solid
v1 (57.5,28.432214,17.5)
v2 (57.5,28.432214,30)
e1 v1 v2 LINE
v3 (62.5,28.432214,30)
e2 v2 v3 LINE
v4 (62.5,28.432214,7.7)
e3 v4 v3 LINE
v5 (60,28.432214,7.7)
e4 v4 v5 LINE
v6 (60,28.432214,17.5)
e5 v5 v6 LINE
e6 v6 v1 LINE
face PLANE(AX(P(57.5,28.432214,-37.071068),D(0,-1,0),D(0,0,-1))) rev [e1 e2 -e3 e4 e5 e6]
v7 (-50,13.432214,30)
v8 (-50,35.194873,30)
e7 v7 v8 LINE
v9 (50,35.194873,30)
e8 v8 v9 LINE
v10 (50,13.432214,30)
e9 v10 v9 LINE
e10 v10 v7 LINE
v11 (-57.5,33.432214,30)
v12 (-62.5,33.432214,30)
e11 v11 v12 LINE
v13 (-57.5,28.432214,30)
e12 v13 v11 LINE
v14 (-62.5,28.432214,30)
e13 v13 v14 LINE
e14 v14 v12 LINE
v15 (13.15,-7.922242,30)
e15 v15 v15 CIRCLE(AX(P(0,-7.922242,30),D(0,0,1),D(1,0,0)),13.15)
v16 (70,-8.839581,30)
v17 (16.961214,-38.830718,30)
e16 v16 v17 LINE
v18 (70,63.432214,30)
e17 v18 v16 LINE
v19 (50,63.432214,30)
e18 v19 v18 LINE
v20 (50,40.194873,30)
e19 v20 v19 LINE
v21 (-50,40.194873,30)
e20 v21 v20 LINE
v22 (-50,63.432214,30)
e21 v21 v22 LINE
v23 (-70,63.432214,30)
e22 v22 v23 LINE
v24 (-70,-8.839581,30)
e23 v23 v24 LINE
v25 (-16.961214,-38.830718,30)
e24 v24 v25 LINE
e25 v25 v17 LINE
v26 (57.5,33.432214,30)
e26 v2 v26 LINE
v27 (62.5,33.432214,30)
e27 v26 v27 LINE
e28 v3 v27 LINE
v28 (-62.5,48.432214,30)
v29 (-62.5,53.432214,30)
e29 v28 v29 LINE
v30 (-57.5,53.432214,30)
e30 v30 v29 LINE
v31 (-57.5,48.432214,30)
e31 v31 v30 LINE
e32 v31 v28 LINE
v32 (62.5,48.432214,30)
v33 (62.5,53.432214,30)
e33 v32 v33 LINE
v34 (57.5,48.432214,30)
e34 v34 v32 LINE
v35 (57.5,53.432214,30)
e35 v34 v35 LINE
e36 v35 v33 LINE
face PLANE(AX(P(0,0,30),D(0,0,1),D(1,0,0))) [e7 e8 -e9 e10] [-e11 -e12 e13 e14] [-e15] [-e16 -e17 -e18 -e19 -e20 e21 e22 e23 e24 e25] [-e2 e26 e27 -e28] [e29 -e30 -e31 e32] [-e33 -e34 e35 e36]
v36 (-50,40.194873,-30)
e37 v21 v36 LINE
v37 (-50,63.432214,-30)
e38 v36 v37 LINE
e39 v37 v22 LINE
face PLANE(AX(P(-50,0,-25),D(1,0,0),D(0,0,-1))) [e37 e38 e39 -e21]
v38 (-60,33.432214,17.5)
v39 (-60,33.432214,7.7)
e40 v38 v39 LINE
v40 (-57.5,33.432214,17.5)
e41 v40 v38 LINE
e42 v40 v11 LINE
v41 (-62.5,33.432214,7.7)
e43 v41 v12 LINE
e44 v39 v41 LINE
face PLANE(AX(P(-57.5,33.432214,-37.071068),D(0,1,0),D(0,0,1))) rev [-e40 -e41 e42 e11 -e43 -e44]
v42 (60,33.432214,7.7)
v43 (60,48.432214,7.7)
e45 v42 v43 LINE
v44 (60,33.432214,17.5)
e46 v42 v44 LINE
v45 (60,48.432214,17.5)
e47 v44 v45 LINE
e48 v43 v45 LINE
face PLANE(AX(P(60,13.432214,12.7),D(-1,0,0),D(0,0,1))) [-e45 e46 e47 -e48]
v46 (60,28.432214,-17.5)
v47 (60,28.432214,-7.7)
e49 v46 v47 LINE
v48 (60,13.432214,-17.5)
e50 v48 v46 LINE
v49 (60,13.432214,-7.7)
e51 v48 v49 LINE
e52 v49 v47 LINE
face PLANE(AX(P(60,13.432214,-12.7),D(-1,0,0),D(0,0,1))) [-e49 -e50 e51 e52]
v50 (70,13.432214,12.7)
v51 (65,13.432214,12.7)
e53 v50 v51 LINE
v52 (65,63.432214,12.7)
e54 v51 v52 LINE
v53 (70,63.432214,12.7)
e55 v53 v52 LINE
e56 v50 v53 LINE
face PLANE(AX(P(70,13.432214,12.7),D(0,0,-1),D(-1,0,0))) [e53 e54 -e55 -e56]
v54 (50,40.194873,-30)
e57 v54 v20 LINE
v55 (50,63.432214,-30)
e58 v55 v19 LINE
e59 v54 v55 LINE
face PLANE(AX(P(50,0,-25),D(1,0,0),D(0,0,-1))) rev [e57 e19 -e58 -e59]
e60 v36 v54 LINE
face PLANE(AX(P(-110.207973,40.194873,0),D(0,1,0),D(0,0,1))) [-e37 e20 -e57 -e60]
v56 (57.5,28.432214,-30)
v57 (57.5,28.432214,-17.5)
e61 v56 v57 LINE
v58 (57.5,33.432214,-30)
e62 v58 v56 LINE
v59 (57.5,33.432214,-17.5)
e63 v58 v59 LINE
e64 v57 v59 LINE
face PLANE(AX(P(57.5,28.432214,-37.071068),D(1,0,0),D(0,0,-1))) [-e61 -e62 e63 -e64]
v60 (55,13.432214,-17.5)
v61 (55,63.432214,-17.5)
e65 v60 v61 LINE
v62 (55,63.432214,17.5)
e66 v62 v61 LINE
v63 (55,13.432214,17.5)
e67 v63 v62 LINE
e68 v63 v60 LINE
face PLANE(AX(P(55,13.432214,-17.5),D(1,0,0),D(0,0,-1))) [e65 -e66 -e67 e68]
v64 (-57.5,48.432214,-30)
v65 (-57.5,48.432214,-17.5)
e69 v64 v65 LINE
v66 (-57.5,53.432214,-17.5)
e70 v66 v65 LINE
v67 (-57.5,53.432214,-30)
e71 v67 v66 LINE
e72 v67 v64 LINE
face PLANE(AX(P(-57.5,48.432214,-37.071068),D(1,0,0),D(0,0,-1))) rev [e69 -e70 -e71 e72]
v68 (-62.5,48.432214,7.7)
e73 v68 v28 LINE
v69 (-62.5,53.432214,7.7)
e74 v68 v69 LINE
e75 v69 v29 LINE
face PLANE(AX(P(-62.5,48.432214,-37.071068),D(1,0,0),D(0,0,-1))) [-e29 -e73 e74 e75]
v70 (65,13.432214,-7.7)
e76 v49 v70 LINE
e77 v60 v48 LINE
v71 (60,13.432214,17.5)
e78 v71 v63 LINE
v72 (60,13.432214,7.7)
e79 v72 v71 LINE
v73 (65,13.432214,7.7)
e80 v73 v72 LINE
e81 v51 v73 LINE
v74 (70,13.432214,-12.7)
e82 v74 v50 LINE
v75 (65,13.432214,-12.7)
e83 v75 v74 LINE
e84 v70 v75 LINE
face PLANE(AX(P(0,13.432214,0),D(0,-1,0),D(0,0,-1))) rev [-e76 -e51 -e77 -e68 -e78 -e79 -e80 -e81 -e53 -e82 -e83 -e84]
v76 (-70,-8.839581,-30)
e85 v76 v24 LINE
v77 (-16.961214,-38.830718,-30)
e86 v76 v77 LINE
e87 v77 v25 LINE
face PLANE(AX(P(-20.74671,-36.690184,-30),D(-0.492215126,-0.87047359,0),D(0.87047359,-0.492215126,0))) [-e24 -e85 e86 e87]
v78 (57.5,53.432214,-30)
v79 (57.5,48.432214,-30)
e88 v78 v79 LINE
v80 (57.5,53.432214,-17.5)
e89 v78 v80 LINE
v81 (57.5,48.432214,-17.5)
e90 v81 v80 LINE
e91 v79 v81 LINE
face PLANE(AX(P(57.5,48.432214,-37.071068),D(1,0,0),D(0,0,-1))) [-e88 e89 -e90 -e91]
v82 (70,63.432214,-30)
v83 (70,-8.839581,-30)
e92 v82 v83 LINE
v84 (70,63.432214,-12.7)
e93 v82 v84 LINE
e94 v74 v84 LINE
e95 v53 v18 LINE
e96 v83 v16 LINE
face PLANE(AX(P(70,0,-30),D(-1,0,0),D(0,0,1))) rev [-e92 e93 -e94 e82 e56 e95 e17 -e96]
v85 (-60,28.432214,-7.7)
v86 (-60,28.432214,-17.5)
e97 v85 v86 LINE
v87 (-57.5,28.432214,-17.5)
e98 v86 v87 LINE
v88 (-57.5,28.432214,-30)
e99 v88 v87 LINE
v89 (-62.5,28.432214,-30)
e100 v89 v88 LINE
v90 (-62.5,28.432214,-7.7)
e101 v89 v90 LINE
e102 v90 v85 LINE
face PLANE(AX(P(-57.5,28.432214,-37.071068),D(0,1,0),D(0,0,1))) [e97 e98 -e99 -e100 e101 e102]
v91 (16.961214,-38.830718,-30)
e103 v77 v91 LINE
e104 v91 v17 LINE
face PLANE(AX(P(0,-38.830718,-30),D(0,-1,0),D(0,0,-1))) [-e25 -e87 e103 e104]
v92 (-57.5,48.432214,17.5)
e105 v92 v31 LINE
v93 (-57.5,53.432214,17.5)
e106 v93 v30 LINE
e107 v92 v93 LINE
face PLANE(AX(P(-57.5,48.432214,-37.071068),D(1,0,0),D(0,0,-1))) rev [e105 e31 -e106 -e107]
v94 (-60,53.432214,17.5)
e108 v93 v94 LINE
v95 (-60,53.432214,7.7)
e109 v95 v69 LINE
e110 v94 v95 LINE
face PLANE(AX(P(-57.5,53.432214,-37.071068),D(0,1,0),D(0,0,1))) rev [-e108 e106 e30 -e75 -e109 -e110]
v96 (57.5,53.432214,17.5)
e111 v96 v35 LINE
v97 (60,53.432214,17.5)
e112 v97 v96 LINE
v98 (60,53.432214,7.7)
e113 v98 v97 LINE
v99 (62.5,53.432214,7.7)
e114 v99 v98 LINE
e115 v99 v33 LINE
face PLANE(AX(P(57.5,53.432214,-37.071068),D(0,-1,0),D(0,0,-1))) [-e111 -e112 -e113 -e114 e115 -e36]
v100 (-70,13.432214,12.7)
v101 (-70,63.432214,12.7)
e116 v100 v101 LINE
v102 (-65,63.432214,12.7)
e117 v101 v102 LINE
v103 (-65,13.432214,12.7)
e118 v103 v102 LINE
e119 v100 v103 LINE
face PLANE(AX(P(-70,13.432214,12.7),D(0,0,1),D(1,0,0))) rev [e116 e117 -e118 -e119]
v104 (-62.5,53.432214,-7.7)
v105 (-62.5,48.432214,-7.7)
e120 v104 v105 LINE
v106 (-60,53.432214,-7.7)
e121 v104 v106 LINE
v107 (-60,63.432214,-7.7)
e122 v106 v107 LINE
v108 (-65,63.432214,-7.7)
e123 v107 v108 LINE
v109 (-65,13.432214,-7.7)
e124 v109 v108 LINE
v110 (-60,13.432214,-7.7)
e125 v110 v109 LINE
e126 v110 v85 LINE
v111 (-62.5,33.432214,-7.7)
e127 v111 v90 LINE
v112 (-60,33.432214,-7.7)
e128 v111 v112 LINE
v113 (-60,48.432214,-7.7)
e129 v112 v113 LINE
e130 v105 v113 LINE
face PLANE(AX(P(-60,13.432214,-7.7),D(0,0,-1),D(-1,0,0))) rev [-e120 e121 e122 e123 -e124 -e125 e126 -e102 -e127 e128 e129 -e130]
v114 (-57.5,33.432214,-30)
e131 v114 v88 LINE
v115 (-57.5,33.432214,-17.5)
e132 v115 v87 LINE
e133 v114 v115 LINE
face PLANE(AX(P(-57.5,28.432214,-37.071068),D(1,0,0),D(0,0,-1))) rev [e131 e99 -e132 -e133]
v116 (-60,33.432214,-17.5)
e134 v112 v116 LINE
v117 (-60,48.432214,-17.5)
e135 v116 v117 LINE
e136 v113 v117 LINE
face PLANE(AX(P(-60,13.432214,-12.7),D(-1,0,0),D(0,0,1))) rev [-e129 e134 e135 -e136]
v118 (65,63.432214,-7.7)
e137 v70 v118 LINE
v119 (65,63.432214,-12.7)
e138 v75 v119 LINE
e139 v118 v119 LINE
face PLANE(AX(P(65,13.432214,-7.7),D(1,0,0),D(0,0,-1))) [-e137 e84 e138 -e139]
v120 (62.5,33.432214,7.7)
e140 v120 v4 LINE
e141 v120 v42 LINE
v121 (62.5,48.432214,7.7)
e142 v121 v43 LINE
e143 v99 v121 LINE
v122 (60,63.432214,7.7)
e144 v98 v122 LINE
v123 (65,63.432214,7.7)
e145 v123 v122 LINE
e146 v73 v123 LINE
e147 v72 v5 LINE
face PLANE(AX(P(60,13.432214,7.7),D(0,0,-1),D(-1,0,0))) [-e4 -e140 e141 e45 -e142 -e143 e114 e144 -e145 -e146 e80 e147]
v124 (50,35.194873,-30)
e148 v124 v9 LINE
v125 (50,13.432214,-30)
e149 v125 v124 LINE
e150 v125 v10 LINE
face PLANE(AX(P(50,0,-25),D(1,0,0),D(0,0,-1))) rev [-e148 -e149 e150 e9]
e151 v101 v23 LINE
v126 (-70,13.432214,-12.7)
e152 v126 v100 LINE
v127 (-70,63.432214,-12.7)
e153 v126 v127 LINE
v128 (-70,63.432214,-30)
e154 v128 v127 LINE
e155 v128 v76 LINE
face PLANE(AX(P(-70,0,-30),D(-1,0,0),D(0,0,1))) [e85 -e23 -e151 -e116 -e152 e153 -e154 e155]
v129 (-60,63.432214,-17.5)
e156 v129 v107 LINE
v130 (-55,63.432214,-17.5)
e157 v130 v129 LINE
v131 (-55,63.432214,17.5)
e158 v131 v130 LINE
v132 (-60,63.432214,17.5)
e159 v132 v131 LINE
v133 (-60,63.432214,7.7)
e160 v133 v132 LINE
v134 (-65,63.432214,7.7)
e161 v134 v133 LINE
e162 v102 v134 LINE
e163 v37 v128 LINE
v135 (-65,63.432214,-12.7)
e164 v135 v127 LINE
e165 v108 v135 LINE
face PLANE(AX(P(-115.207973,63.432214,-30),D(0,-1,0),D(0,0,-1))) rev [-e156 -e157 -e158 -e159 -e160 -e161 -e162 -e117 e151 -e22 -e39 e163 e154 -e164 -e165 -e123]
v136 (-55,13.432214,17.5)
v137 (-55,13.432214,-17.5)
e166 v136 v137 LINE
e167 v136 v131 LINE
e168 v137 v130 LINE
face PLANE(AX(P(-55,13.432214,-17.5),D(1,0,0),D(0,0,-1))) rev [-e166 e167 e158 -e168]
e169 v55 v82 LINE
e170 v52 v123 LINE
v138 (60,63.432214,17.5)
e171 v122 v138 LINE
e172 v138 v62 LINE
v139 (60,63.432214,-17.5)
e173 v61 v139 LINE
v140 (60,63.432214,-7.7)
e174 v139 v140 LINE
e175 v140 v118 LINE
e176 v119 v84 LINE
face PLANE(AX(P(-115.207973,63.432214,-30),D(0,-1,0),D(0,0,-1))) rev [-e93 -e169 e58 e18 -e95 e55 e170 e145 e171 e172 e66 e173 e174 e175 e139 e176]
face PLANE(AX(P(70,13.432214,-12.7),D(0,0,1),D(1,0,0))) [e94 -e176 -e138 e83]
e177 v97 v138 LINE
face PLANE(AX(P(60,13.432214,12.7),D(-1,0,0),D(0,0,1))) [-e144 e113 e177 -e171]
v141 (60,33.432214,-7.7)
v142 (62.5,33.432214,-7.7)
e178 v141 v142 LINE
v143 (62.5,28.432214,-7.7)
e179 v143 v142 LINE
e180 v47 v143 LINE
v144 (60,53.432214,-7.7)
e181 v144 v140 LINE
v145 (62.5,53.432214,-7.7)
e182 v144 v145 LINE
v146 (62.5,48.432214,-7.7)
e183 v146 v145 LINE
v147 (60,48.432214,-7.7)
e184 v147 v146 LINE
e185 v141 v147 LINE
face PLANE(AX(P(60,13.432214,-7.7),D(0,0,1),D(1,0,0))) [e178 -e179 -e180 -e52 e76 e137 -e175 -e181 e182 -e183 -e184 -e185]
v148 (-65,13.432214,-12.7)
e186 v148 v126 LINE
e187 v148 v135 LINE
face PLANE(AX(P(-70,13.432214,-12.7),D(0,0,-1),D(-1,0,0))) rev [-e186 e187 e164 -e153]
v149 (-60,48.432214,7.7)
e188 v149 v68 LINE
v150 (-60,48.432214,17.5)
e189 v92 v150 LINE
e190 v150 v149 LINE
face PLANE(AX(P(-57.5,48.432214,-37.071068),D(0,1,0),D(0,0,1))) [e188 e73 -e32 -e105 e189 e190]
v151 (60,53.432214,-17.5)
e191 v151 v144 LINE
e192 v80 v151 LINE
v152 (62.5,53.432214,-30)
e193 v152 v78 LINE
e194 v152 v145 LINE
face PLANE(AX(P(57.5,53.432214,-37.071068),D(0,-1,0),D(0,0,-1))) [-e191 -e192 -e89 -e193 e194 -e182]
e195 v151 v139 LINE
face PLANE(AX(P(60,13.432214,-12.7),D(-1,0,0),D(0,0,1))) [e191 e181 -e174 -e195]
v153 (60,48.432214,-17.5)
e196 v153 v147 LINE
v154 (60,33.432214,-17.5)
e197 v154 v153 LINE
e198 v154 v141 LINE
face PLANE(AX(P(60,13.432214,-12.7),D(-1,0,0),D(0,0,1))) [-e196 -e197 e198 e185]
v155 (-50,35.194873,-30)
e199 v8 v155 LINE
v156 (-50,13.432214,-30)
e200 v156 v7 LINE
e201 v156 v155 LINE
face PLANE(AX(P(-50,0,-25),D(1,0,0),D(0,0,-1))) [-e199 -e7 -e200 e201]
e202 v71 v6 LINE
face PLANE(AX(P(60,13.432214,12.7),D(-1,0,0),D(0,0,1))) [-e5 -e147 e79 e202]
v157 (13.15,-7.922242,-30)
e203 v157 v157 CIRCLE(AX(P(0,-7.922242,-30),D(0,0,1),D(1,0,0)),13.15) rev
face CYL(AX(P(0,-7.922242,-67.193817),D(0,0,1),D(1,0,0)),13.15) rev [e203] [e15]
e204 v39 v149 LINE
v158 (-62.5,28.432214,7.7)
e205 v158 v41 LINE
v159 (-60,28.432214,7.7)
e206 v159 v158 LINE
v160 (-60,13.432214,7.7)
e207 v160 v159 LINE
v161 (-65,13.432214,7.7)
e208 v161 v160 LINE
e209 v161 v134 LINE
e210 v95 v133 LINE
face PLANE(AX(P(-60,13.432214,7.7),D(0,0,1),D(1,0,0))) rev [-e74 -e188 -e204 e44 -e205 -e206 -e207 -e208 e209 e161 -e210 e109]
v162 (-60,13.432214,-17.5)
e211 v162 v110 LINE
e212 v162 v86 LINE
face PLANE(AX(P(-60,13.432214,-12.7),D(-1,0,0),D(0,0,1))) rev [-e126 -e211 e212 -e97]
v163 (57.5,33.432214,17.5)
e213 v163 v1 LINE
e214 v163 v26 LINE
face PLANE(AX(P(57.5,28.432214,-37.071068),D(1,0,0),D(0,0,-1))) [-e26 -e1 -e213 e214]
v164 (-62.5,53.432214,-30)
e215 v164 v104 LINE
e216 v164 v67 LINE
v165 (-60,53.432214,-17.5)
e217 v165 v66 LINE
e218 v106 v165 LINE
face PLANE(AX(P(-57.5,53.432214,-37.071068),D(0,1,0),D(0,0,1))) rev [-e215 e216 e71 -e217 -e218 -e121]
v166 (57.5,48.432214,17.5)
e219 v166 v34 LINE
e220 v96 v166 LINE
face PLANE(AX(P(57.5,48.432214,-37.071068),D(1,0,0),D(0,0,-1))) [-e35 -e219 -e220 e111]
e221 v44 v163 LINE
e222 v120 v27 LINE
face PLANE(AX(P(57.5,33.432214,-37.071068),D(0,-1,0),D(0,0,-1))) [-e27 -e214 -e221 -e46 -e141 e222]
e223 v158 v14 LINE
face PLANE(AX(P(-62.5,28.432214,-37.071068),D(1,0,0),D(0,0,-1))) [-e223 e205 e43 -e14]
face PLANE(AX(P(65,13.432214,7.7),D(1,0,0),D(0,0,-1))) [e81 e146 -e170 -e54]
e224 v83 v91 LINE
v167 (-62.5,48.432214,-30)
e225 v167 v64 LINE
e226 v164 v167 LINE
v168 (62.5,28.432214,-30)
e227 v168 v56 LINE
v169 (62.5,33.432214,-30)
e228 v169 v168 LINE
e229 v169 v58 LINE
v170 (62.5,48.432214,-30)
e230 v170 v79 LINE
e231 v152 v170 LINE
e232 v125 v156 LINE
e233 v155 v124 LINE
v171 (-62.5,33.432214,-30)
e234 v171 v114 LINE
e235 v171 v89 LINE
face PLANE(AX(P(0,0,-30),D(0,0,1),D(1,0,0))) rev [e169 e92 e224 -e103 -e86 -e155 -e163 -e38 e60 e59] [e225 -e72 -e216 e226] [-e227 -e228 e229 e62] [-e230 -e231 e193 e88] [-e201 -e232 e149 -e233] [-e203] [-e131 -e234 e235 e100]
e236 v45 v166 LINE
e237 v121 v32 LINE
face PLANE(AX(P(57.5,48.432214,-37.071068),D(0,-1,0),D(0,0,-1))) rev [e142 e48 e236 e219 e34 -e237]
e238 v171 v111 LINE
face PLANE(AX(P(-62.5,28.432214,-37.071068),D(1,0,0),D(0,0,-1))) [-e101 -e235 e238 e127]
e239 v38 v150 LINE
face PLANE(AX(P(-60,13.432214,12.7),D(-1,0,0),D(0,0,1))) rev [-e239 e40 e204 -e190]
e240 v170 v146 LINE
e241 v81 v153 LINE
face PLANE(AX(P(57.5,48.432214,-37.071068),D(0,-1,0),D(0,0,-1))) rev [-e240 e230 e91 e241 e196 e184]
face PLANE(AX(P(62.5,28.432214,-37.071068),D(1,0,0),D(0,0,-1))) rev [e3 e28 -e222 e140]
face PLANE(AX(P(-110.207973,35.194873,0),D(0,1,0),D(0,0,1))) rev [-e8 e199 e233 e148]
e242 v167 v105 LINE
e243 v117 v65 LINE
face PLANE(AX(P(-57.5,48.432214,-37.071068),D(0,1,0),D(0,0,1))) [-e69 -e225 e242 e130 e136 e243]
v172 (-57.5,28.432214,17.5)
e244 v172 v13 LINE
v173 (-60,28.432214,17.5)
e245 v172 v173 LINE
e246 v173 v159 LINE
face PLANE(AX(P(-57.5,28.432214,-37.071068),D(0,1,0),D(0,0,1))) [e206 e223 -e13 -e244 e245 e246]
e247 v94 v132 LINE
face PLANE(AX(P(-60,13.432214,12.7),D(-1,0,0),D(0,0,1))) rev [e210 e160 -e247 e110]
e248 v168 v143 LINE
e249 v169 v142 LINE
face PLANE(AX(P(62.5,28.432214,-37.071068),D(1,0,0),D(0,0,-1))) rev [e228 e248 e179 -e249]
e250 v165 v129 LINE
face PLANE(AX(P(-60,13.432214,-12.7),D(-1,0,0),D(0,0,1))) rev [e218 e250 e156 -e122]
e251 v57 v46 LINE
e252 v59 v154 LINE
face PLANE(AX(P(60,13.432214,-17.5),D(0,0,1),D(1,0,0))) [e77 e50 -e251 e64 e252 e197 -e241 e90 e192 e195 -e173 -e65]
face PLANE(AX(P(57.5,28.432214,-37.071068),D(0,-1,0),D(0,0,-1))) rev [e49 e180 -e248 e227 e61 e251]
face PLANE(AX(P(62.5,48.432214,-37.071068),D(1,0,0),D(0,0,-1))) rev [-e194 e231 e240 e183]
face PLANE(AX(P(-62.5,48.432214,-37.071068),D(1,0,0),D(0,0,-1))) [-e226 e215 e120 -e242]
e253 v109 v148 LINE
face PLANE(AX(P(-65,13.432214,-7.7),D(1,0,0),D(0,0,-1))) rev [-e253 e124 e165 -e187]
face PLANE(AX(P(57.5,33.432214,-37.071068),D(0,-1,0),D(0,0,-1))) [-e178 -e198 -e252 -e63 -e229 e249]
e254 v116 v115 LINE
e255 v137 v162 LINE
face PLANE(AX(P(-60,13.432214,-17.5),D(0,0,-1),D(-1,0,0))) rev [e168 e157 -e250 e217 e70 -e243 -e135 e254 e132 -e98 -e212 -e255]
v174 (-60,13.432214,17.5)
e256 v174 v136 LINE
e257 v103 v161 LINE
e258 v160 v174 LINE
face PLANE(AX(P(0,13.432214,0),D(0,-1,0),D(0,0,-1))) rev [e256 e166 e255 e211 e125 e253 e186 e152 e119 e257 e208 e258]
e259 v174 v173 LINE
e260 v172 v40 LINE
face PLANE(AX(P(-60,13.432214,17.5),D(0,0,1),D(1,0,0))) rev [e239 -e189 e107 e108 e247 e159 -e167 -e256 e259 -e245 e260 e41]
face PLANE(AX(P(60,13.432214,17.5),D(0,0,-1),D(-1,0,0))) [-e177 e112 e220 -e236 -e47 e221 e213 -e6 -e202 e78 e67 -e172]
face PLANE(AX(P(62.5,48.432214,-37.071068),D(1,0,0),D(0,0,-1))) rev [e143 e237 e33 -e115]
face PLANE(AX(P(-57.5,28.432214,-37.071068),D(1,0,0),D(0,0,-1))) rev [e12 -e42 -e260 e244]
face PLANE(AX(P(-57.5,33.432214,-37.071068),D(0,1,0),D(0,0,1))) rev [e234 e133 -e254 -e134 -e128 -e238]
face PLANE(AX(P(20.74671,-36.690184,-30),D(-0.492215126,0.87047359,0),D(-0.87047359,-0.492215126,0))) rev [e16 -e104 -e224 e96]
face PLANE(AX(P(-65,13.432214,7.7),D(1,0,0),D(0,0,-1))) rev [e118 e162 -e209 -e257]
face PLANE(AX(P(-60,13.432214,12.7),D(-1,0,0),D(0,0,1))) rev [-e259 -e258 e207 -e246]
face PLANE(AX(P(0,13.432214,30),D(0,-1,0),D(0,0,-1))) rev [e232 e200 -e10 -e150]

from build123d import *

# Parameters (mm, degrees)
BOSS_EXTRUDE2_DEPTH            = 30
BOSS_EXTRUDE2_DEPTH_BACK       = 30
EXTRUDE_THIN2_START            = -25
EXTRUDE_THIN2_DEPTH            = 50
SKETCH2_W                      = 60
SKETCH2_H                      = 5
BOSS_EXTRUDE3_DEPTH            = 100
BOSS_EXTRUDE4_DEPTH            = 30
BOSS_EXTRUDE4_DEPTH_BACK       = 30
CUT_EXTRUDE2_REACH             = 143.361
SKETCH4_W                      = 60
SKETCH4_H                      = 5
CUT_EXTRUDE2_DIRECTION_2_REACH = 143.361
BOSS_EXTRUDE5_DEPTH            = 30
BOSS_EXTRUDE5_DEPTH_BACK       = 30
DRONE_ARM_FIT_CUT_DEPTH        = 50
CUT_EXTRUDE3_START             = -60
SKETCH8_W                      = 5
SKETCH8_H                      = 5
CUT_EXTRUDE3_DEPTH             = 60
SKETCH10_R                     = 13.15
CUT_EXTRUDE5_DEPTH             = 60


# Read off the part's stored shape, not the designer's step: Extrude-Thin2
with BuildPart() as part:
    # Sketch1 → Boss-Extrude2 (new, two sides: drawn at the far end of the back side and taken through both)
    with BuildSketch(Plane.XY.offset(-BOSS_EXTRUDE2_DEPTH_BACK)):
        Polygon((-13.01396445, -23.830717844), (13.01396445, -23.830717844), (55, -0.089432632), (55, 13.432214294), (-55, 13.432214294), (-55, -0.089432632), align=None)
    extrude(amount=BOSS_EXTRUDE2_DEPTH + BOSS_EXTRUDE2_DEPTH_BACK)

    # Extrude-Thin2 outline → Extrude-Thin2 (add)
    with BuildSketch(Plane.XY.offset(EXTRUDE_THIN2_START)):
        Polygon((50, 13.432214294), (55, 13.432214294), (55, 68.432214294), (-55, 68.432214294), (-55, 13.432214294), (-50, 13.432214294), (-50, 63.432214294), (50, 63.432214294), align=None)
    extrude(amount=EXTRUDE_THIN2_DEPTH)

    # Sketch2 → Boss-Extrude3 (add)
    with BuildSketch(Plane.ZY.offset(-50)):
        with Locations((0, 37.694873029)):
            Rectangle(SKETCH2_W, SKETCH2_H)
    extrude(amount=BOSS_EXTRUDE3_DEPTH)

    # Sketch1<6> → Boss-Extrude4 (add, two sides: drawn at the far end of the back side and taken through both)
    with BuildSketch(Plane.XY.offset(-BOSS_EXTRUDE4_DEPTH_BACK)):
        Polygon((-55, -0.089432632), (-55, 13.432214294), (-70, 13.432214294), (-70, -8.839581066), (-16.961214453, -38.830717844), (16.961214453, -38.830717844), (70, -8.839581066), (70, 13.432214294), (55, 13.432214294), (55, -0.089432632), (13.01396445, -23.830717844), (-13.01396445, -23.830717844), align=None)
    extrude(amount=BOSS_EXTRUDE4_DEPTH + BOSS_EXTRUDE4_DEPTH_BACK)

    # Cut-Extrude2: up to this face of the body (flat: up to its plane)
    cut_extrude2_end = Plane(part.part.faces().sort_by_distance((-55, 40.932214294, 0))[0])
    # Sketch4 → Cut-Extrude2 (cut, up to the picked face)
    with BuildSketch(Plane(origin=(-50, 0, 0), x_dir=(0, 0, -1), z_dir=(1, 0, 0)), mode=Mode.PRIVATE) as cut_extrude2_sk1:
        with Locations((0, 65.932214294)):
            Rectangle(SKETCH4_W, SKETCH4_H)
    cut_extrude2_tool1 = split(extrude(cut_extrude2_sk1.sketch, amount=-CUT_EXTRUDE2_REACH, mode=Mode.PRIVATE), bisect_by=cut_extrude2_end, keep=Keep.BOTH, mode=Mode.PRIVATE)
    add(cut_extrude2_tool1.solids().sort_by(Axis((-50, 65.932214, 0), (-1, 0, 0)))[0], mode=Mode.SUBTRACT)

    # Cut-Extrude2 direction 2: up to this face of the body (flat: up to its plane)
    cut_extrude2_direction_2_end = Plane(part.part.faces().sort_by_distance((55, 40.932214294, 0))[0])
    # Sketch4 → Cut-Extrude2 direction 2 (cut, up to the picked face)
    with BuildSketch(Plane(origin=(-50, 0, 0), x_dir=(0, 0, -1), z_dir=(1, 0, 0)), mode=Mode.PRIVATE) as cut_extrude2_direction_2_sk1:
        with Locations((0, 65.932214294)):
            Rectangle(SKETCH4_W, SKETCH4_H)
    cut_extrude2_direction_2_tool1 = split(extrude(cut_extrude2_direction_2_sk1.sketch, amount=CUT_EXTRUDE2_DIRECTION_2_REACH, mode=Mode.PRIVATE), bisect_by=cut_extrude2_direction_2_end, keep=Keep.BOTH, mode=Mode.PRIVATE)
    add(cut_extrude2_direction_2_tool1.solids().sort_by(Axis((-50, 65.932214, 0), (1, 0, 0)))[0], mode=Mode.SUBTRACT)

    # Sketch1<7> → Boss-Extrude5 (add, two sides: drawn at the far end of the back side and taken through both)
    with BuildSketch(Plane.XY.offset(-BOSS_EXTRUDE5_DEPTH_BACK)):
        Polygon((-70, 13.432214294), (-55, 13.432214294), (-50, 13.432214294), (-50, 38.432214294), (-50, 63.432214294), (-70, 63.432214294), (-70, 38.432214294), align=None)
        Polygon((50, 38.432214294), (50, 13.432214294), (55, 13.432214294), (70, 13.432214294), (70, 38.432214294), (70, 63.432214294), (50, 63.432214294), align=None)
    extrude(amount=BOSS_EXTRUDE5_DEPTH + BOSS_EXTRUDE5_DEPTH_BACK)

    # Sketch7 → Drone Arm fit cut (cut)
    with BuildSketch(Plane(origin=(0, 63.432214294, 0), x_dir=(1, 0, 0), z_dir=(0, 1, 0))):
        Polygon((-70, -12.7), (-70, 12.7), (-65, 12.7), (-65, 7.7), (-60, 7.7), (-60, 12.7), (-60, 17.5), (-55, 17.5), (-55, -17.5), (-60, -17.5), (-60, -12.7), (-60, -7.7), (-65, -7.7), (-65, -12.7), align=None)
    drone_arm_fit_cut = extrude(amount=-DRONE_ARM_FIT_CUT_DEPTH, mode=Mode.SUBTRACT)

    # Mirror Drone arm fit cut: Drone Arm fit cut across plane
    add(drone_arm_fit_cut.mirror(Plane(origin=(0, 0, 0), x_dir=(0, 0, 1), z_dir=(1, 0, 0))), mode=Mode.SUBTRACT)

    # Sketch8 → Cut-Extrude3 (cut)
    with BuildSketch(Plane.XY.offset(30).offset(CUT_EXTRUDE3_START)):
        with Locations((-60, 50.932214294)):
            Rectangle(SKETCH8_W, SKETCH8_H)
        with Locations((-60, 30.932214294)):
            Rectangle(SKETCH8_W, SKETCH8_H)
    cut_extrude3 = extrude(amount=CUT_EXTRUDE3_DEPTH, mode=Mode.SUBTRACT)

    # Mirror1: Cut-Extrude3 across plane
    add(cut_extrude3.mirror(Plane(origin=(0, 0, 0), x_dir=(0, 0, 1), z_dir=(1, 0, 0))), mode=Mode.SUBTRACT)

    # Sketch10 → Cut-Extrude5 (cut)
    with BuildSketch(Plane.XY.offset(30)):
        with Locations((0, -7.922241987)):
            Circle(SKETCH10_R)
    extrude(amount=-CUT_EXTRUDE5_DEPTH, mode=Mode.SUBTRACT)


solid = part.part
